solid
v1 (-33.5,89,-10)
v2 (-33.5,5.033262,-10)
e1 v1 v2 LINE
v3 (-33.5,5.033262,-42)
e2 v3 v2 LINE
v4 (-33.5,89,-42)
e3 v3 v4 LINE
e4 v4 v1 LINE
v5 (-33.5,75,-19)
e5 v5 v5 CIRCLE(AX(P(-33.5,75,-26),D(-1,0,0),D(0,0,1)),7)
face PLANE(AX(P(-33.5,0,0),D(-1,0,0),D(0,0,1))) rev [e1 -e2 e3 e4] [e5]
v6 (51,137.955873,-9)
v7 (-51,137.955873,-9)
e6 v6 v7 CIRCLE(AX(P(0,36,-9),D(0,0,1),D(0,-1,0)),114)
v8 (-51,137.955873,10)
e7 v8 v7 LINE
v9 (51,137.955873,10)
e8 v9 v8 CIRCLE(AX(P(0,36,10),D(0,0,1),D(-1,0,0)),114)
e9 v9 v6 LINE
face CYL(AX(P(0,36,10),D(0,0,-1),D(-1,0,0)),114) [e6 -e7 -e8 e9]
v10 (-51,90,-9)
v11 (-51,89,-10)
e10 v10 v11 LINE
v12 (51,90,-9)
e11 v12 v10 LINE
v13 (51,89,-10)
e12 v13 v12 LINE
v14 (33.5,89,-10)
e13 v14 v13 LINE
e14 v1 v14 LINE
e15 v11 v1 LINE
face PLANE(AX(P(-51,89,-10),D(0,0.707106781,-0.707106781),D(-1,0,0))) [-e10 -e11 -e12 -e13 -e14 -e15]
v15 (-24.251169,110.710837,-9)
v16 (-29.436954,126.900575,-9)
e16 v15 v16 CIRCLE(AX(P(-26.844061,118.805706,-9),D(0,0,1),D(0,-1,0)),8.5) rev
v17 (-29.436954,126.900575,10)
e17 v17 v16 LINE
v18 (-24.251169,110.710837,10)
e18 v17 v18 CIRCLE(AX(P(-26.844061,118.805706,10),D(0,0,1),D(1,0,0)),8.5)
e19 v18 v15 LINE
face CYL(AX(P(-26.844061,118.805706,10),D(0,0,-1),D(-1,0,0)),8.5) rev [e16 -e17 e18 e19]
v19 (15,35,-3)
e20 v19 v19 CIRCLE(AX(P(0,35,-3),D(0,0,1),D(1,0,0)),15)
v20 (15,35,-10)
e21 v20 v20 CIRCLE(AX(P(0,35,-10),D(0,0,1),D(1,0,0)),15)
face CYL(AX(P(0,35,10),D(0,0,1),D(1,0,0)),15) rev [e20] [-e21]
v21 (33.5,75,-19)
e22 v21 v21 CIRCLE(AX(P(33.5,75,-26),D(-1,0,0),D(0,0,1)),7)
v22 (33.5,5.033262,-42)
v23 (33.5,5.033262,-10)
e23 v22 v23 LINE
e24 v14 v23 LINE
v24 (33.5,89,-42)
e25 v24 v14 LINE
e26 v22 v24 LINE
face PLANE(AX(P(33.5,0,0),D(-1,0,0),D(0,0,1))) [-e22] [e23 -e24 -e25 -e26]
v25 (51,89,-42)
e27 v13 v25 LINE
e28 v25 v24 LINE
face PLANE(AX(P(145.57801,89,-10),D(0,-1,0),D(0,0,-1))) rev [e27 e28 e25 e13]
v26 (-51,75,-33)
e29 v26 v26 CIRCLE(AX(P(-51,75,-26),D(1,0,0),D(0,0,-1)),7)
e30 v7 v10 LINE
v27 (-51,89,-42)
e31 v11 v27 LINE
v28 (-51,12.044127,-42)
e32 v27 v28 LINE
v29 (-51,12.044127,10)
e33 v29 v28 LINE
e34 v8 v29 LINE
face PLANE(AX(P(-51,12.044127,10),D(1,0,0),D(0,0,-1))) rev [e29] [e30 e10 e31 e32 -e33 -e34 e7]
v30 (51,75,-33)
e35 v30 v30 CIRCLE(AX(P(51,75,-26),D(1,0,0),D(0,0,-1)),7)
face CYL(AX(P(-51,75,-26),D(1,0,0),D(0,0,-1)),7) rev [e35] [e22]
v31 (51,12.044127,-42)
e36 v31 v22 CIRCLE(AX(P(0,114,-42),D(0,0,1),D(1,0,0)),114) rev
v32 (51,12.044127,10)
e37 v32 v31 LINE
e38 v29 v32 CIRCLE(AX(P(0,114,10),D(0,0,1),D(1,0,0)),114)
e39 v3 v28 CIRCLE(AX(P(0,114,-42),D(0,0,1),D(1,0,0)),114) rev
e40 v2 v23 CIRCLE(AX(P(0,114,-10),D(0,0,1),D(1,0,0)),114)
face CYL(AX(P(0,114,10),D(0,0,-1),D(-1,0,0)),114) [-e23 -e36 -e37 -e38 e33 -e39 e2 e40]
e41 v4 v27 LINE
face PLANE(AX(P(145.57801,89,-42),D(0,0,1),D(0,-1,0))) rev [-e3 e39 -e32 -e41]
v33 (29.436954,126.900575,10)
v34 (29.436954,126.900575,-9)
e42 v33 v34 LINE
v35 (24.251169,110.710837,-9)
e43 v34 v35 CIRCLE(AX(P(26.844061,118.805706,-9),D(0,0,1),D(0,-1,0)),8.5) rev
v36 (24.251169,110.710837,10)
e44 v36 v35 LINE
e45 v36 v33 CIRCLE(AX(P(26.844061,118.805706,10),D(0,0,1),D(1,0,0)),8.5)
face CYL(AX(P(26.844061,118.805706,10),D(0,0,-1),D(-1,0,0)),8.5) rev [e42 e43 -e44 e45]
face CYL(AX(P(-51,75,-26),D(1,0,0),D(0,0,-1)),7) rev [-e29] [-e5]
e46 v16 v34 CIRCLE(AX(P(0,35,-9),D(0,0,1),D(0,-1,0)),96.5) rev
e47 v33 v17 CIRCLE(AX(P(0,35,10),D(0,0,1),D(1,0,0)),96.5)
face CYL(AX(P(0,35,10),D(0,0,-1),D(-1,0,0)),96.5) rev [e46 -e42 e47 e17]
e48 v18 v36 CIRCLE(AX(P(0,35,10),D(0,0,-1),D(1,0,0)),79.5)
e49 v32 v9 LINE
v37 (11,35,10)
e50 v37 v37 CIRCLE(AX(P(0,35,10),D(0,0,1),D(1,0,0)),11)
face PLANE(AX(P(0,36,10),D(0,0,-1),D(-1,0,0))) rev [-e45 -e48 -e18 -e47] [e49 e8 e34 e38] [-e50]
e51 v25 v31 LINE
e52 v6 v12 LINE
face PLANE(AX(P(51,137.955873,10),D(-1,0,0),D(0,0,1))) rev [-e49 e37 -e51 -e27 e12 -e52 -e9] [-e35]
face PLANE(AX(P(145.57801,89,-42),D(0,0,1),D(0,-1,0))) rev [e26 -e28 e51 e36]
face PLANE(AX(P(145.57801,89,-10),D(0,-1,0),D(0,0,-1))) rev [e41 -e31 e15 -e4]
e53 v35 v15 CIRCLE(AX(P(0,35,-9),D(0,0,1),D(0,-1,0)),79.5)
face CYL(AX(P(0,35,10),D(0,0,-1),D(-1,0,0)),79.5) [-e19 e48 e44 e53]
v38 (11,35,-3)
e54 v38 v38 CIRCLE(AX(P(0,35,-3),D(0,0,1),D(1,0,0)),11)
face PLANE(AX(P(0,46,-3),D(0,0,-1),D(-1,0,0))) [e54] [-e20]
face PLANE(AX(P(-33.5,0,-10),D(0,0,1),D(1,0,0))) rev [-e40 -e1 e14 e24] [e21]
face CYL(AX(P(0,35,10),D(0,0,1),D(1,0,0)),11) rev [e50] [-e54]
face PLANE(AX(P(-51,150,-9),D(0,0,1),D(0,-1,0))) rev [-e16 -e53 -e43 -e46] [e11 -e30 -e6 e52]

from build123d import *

# Parameters (mm, degrees)
Y_KSEKLIK_EKSTR_ZYON1_DEPTH      = 10
KES_EKSTR_ZYON1_DEPTH            = 159.748228337
KES_EKSTR_ZYON1_DEPTH_BACK       = 159.748228337
IZIM3_W                          = 1
IZIM3_H                          = 61
PAH1_SIZE                        = 1
Y_KSEKLIK_EKSTR_ZYON2_DEPTH      = 51
Y_KSEKLIK_EKSTR_ZYON2_DEPTH_BACK = 51
IZIM4_W                          = 32
IZIM4_H                          = 89
KES_EKSTR_ZYON2_DEPTH            = 162.632298752
IZIM8_W                          = 32
IZIM8_H                          = 89
KES_EKSTR_ZYON3_DEPTH            = 33.5
KES_EKSTR_ZYON4_DEPTH            = 164.905460556
KES_EKSTR_ZYON4_DEPTH_BACK       = 164.905460556
IZIM9_R                          = 7
KES_EKSTR_ZYON5_DEPTH            = 164.905460556
KES_EKSTR_ZYON5_DEPTH_BACK       = 164.905460556


with BuildPart() as part:
    # Çizim2 → Yükseklik-Ekstrüzyon1 (new, symmetric)
    with BuildSketch(Plane.XY):
        with BuildLine():
            Line((-51, 12.044127192), (-51, 137.955872808))
            ThreePointArc((-51, 137.955872808), (0, 150), (51, 137.955872808))
            Line((51, 137.955872808), (51, 12.044127192))
            ThreePointArc((51, 12.044127192), (0, 0), (-51, 12.044127192))
        make_face()
    extrude(amount=Y_KSEKLIK_EKSTR_ZYON1_DEPTH, both=True)

    # Çizim3 → Kes-Ekstrüzyon1 (cut, two sides: drawn at the far end of the back side and taken through both)
    with BuildSketch(Plane(origin=(0, 0, 0), x_dir=(0, 0, -1), z_dir=(1, 0, 0)).offset(-KES_EKSTR_ZYON1_DEPTH_BACK)):
        with Locations((9.5, 119.5)):
            Rectangle(IZIM3_W, IZIM3_H)
    extrude(amount=KES_EKSTR_ZYON1_DEPTH + KES_EKSTR_ZYON1_DEPTH_BACK, mode=Mode.SUBTRACT)

    # Pah1
    pah1_edges = [part.edges().sort_by_distance(p)[0] for p in [
        (0, 89, -9),
    ]]
    chamfer(pah1_edges, length=PAH1_SIZE - 0.0001)  # a hair under: the kernel refuses the full size

    # Çizim4 → Yükseklik-Ekstrüzyon2 (add, two sides: drawn at the far end of the back side and taken through both)
    with BuildSketch(Plane(origin=(0, 0, 0), x_dir=(0, 0, -1), z_dir=(1, 0, 0)).offset(-Y_KSEKLIK_EKSTR_ZYON2_DEPTH_BACK)):
        with Locations((26, 44.5)):
            Rectangle(IZIM4_W, IZIM4_H)
    extrude(amount=Y_KSEKLIK_EKSTR_ZYON2_DEPTH + Y_KSEKLIK_EKSTR_ZYON2_DEPTH_BACK)

    # Çizim7 → Kes-Ekstrüzyon2 (cut, through all)
    with BuildSketch(Plane.XY.offset(-10)):
        with BuildLine():
            ThreePointArc((0, 0), (-26.201436028, 3.051882621), (-51, 12.044127192))
            Line((-51, 12.044127192), (-51, 0))
            Line((-51, 0), (0, 0))
        make_face()
        with BuildLine():
            ThreePointArc((51, 12.044127192), (26.201436028, 3.051882621), (0, 0))
            Line((0, 0), (51, 0))
            Line((51, 0), (51, 12.044127192))
        make_face()
    extrude(amount=-KES_EKSTR_ZYON2_DEPTH, mode=Mode.SUBTRACT)

    # Çizim8 → Kes-Ekstrüzyon3 (cut, symmetric)
    with BuildSketch(Plane(origin=(0, 0, 0), x_dir=(0, 0, -1), z_dir=(1, 0, 0))):
        with Locations((26, 44.5)):
            Rectangle(IZIM8_W, IZIM8_H)
    extrude(amount=KES_EKSTR_ZYON3_DEPTH, both=True, mode=Mode.SUBTRACT)

    # Çizim9 → Kes-Ekstrüzyon4 (cut, two sides: drawn at the far end of the back side and taken through both)
    with BuildSketch(Plane(origin=(0, 0, 0), x_dir=(0, 0, -1), z_dir=(1, 0, 0)).offset(-KES_EKSTR_ZYON4_DEPTH_BACK)):
        with Locations((26, 75)):
            Circle(IZIM9_R)
    extrude(amount=KES_EKSTR_ZYON4_DEPTH + KES_EKSTR_ZYON4_DEPTH_BACK, mode=Mode.SUBTRACT)

    # Çizim10 → Kes-Döndür1 (revolve, cut)
    with BuildSketch(Plane(origin=(0, 0, 0), x_dir=(0, 0, -1), z_dir=(1, 0, 0)), mode=Mode.PRIVATE) as kes_d_nd_r1_sk:
        Polygon((-10, 35), (-10, 46), (3, 46), (3, 50), (10, 50), (10, 35), align=None)
    revolve(kes_d_nd_r1_sk.sketch.rotate(Axis((0, 35, 10), (0, 0, -1)), 90), axis=Axis((0, 35, 10), (0, 0, -1)), mode=Mode.SUBTRACT)

    # Çizim11 → Kes-Ekstrüzyon5 (cut, two sides: drawn at the far end of the back side and taken through both)
    with BuildSketch(Plane.XY.offset(-KES_EKSTR_ZYON5_DEPTH_BACK)):
        with BuildLine():
            ThreePointArc((29.436953678, 126.900575396), (0, 131.5), (-29.436953678, 126.900575396))
            ThreePointArc((-29.436953678, 126.900575396), (-34.938930721, 116.212813768), (-24.251169092, 110.710836725))
            ThreePointArc((-24.251169092, 110.710836725), (0, 114.5), (24.251169092, 110.710836725))
            ThreePointArc((24.251169092, 110.710836725), (34.938930721, 116.212813768), (29.436953678, 126.900575396))
        make_face()
    extrude(amount=KES_EKSTR_ZYON5_DEPTH + KES_EKSTR_ZYON5_DEPTH_BACK, mode=Mode.SUBTRACT)


solid = part.part
